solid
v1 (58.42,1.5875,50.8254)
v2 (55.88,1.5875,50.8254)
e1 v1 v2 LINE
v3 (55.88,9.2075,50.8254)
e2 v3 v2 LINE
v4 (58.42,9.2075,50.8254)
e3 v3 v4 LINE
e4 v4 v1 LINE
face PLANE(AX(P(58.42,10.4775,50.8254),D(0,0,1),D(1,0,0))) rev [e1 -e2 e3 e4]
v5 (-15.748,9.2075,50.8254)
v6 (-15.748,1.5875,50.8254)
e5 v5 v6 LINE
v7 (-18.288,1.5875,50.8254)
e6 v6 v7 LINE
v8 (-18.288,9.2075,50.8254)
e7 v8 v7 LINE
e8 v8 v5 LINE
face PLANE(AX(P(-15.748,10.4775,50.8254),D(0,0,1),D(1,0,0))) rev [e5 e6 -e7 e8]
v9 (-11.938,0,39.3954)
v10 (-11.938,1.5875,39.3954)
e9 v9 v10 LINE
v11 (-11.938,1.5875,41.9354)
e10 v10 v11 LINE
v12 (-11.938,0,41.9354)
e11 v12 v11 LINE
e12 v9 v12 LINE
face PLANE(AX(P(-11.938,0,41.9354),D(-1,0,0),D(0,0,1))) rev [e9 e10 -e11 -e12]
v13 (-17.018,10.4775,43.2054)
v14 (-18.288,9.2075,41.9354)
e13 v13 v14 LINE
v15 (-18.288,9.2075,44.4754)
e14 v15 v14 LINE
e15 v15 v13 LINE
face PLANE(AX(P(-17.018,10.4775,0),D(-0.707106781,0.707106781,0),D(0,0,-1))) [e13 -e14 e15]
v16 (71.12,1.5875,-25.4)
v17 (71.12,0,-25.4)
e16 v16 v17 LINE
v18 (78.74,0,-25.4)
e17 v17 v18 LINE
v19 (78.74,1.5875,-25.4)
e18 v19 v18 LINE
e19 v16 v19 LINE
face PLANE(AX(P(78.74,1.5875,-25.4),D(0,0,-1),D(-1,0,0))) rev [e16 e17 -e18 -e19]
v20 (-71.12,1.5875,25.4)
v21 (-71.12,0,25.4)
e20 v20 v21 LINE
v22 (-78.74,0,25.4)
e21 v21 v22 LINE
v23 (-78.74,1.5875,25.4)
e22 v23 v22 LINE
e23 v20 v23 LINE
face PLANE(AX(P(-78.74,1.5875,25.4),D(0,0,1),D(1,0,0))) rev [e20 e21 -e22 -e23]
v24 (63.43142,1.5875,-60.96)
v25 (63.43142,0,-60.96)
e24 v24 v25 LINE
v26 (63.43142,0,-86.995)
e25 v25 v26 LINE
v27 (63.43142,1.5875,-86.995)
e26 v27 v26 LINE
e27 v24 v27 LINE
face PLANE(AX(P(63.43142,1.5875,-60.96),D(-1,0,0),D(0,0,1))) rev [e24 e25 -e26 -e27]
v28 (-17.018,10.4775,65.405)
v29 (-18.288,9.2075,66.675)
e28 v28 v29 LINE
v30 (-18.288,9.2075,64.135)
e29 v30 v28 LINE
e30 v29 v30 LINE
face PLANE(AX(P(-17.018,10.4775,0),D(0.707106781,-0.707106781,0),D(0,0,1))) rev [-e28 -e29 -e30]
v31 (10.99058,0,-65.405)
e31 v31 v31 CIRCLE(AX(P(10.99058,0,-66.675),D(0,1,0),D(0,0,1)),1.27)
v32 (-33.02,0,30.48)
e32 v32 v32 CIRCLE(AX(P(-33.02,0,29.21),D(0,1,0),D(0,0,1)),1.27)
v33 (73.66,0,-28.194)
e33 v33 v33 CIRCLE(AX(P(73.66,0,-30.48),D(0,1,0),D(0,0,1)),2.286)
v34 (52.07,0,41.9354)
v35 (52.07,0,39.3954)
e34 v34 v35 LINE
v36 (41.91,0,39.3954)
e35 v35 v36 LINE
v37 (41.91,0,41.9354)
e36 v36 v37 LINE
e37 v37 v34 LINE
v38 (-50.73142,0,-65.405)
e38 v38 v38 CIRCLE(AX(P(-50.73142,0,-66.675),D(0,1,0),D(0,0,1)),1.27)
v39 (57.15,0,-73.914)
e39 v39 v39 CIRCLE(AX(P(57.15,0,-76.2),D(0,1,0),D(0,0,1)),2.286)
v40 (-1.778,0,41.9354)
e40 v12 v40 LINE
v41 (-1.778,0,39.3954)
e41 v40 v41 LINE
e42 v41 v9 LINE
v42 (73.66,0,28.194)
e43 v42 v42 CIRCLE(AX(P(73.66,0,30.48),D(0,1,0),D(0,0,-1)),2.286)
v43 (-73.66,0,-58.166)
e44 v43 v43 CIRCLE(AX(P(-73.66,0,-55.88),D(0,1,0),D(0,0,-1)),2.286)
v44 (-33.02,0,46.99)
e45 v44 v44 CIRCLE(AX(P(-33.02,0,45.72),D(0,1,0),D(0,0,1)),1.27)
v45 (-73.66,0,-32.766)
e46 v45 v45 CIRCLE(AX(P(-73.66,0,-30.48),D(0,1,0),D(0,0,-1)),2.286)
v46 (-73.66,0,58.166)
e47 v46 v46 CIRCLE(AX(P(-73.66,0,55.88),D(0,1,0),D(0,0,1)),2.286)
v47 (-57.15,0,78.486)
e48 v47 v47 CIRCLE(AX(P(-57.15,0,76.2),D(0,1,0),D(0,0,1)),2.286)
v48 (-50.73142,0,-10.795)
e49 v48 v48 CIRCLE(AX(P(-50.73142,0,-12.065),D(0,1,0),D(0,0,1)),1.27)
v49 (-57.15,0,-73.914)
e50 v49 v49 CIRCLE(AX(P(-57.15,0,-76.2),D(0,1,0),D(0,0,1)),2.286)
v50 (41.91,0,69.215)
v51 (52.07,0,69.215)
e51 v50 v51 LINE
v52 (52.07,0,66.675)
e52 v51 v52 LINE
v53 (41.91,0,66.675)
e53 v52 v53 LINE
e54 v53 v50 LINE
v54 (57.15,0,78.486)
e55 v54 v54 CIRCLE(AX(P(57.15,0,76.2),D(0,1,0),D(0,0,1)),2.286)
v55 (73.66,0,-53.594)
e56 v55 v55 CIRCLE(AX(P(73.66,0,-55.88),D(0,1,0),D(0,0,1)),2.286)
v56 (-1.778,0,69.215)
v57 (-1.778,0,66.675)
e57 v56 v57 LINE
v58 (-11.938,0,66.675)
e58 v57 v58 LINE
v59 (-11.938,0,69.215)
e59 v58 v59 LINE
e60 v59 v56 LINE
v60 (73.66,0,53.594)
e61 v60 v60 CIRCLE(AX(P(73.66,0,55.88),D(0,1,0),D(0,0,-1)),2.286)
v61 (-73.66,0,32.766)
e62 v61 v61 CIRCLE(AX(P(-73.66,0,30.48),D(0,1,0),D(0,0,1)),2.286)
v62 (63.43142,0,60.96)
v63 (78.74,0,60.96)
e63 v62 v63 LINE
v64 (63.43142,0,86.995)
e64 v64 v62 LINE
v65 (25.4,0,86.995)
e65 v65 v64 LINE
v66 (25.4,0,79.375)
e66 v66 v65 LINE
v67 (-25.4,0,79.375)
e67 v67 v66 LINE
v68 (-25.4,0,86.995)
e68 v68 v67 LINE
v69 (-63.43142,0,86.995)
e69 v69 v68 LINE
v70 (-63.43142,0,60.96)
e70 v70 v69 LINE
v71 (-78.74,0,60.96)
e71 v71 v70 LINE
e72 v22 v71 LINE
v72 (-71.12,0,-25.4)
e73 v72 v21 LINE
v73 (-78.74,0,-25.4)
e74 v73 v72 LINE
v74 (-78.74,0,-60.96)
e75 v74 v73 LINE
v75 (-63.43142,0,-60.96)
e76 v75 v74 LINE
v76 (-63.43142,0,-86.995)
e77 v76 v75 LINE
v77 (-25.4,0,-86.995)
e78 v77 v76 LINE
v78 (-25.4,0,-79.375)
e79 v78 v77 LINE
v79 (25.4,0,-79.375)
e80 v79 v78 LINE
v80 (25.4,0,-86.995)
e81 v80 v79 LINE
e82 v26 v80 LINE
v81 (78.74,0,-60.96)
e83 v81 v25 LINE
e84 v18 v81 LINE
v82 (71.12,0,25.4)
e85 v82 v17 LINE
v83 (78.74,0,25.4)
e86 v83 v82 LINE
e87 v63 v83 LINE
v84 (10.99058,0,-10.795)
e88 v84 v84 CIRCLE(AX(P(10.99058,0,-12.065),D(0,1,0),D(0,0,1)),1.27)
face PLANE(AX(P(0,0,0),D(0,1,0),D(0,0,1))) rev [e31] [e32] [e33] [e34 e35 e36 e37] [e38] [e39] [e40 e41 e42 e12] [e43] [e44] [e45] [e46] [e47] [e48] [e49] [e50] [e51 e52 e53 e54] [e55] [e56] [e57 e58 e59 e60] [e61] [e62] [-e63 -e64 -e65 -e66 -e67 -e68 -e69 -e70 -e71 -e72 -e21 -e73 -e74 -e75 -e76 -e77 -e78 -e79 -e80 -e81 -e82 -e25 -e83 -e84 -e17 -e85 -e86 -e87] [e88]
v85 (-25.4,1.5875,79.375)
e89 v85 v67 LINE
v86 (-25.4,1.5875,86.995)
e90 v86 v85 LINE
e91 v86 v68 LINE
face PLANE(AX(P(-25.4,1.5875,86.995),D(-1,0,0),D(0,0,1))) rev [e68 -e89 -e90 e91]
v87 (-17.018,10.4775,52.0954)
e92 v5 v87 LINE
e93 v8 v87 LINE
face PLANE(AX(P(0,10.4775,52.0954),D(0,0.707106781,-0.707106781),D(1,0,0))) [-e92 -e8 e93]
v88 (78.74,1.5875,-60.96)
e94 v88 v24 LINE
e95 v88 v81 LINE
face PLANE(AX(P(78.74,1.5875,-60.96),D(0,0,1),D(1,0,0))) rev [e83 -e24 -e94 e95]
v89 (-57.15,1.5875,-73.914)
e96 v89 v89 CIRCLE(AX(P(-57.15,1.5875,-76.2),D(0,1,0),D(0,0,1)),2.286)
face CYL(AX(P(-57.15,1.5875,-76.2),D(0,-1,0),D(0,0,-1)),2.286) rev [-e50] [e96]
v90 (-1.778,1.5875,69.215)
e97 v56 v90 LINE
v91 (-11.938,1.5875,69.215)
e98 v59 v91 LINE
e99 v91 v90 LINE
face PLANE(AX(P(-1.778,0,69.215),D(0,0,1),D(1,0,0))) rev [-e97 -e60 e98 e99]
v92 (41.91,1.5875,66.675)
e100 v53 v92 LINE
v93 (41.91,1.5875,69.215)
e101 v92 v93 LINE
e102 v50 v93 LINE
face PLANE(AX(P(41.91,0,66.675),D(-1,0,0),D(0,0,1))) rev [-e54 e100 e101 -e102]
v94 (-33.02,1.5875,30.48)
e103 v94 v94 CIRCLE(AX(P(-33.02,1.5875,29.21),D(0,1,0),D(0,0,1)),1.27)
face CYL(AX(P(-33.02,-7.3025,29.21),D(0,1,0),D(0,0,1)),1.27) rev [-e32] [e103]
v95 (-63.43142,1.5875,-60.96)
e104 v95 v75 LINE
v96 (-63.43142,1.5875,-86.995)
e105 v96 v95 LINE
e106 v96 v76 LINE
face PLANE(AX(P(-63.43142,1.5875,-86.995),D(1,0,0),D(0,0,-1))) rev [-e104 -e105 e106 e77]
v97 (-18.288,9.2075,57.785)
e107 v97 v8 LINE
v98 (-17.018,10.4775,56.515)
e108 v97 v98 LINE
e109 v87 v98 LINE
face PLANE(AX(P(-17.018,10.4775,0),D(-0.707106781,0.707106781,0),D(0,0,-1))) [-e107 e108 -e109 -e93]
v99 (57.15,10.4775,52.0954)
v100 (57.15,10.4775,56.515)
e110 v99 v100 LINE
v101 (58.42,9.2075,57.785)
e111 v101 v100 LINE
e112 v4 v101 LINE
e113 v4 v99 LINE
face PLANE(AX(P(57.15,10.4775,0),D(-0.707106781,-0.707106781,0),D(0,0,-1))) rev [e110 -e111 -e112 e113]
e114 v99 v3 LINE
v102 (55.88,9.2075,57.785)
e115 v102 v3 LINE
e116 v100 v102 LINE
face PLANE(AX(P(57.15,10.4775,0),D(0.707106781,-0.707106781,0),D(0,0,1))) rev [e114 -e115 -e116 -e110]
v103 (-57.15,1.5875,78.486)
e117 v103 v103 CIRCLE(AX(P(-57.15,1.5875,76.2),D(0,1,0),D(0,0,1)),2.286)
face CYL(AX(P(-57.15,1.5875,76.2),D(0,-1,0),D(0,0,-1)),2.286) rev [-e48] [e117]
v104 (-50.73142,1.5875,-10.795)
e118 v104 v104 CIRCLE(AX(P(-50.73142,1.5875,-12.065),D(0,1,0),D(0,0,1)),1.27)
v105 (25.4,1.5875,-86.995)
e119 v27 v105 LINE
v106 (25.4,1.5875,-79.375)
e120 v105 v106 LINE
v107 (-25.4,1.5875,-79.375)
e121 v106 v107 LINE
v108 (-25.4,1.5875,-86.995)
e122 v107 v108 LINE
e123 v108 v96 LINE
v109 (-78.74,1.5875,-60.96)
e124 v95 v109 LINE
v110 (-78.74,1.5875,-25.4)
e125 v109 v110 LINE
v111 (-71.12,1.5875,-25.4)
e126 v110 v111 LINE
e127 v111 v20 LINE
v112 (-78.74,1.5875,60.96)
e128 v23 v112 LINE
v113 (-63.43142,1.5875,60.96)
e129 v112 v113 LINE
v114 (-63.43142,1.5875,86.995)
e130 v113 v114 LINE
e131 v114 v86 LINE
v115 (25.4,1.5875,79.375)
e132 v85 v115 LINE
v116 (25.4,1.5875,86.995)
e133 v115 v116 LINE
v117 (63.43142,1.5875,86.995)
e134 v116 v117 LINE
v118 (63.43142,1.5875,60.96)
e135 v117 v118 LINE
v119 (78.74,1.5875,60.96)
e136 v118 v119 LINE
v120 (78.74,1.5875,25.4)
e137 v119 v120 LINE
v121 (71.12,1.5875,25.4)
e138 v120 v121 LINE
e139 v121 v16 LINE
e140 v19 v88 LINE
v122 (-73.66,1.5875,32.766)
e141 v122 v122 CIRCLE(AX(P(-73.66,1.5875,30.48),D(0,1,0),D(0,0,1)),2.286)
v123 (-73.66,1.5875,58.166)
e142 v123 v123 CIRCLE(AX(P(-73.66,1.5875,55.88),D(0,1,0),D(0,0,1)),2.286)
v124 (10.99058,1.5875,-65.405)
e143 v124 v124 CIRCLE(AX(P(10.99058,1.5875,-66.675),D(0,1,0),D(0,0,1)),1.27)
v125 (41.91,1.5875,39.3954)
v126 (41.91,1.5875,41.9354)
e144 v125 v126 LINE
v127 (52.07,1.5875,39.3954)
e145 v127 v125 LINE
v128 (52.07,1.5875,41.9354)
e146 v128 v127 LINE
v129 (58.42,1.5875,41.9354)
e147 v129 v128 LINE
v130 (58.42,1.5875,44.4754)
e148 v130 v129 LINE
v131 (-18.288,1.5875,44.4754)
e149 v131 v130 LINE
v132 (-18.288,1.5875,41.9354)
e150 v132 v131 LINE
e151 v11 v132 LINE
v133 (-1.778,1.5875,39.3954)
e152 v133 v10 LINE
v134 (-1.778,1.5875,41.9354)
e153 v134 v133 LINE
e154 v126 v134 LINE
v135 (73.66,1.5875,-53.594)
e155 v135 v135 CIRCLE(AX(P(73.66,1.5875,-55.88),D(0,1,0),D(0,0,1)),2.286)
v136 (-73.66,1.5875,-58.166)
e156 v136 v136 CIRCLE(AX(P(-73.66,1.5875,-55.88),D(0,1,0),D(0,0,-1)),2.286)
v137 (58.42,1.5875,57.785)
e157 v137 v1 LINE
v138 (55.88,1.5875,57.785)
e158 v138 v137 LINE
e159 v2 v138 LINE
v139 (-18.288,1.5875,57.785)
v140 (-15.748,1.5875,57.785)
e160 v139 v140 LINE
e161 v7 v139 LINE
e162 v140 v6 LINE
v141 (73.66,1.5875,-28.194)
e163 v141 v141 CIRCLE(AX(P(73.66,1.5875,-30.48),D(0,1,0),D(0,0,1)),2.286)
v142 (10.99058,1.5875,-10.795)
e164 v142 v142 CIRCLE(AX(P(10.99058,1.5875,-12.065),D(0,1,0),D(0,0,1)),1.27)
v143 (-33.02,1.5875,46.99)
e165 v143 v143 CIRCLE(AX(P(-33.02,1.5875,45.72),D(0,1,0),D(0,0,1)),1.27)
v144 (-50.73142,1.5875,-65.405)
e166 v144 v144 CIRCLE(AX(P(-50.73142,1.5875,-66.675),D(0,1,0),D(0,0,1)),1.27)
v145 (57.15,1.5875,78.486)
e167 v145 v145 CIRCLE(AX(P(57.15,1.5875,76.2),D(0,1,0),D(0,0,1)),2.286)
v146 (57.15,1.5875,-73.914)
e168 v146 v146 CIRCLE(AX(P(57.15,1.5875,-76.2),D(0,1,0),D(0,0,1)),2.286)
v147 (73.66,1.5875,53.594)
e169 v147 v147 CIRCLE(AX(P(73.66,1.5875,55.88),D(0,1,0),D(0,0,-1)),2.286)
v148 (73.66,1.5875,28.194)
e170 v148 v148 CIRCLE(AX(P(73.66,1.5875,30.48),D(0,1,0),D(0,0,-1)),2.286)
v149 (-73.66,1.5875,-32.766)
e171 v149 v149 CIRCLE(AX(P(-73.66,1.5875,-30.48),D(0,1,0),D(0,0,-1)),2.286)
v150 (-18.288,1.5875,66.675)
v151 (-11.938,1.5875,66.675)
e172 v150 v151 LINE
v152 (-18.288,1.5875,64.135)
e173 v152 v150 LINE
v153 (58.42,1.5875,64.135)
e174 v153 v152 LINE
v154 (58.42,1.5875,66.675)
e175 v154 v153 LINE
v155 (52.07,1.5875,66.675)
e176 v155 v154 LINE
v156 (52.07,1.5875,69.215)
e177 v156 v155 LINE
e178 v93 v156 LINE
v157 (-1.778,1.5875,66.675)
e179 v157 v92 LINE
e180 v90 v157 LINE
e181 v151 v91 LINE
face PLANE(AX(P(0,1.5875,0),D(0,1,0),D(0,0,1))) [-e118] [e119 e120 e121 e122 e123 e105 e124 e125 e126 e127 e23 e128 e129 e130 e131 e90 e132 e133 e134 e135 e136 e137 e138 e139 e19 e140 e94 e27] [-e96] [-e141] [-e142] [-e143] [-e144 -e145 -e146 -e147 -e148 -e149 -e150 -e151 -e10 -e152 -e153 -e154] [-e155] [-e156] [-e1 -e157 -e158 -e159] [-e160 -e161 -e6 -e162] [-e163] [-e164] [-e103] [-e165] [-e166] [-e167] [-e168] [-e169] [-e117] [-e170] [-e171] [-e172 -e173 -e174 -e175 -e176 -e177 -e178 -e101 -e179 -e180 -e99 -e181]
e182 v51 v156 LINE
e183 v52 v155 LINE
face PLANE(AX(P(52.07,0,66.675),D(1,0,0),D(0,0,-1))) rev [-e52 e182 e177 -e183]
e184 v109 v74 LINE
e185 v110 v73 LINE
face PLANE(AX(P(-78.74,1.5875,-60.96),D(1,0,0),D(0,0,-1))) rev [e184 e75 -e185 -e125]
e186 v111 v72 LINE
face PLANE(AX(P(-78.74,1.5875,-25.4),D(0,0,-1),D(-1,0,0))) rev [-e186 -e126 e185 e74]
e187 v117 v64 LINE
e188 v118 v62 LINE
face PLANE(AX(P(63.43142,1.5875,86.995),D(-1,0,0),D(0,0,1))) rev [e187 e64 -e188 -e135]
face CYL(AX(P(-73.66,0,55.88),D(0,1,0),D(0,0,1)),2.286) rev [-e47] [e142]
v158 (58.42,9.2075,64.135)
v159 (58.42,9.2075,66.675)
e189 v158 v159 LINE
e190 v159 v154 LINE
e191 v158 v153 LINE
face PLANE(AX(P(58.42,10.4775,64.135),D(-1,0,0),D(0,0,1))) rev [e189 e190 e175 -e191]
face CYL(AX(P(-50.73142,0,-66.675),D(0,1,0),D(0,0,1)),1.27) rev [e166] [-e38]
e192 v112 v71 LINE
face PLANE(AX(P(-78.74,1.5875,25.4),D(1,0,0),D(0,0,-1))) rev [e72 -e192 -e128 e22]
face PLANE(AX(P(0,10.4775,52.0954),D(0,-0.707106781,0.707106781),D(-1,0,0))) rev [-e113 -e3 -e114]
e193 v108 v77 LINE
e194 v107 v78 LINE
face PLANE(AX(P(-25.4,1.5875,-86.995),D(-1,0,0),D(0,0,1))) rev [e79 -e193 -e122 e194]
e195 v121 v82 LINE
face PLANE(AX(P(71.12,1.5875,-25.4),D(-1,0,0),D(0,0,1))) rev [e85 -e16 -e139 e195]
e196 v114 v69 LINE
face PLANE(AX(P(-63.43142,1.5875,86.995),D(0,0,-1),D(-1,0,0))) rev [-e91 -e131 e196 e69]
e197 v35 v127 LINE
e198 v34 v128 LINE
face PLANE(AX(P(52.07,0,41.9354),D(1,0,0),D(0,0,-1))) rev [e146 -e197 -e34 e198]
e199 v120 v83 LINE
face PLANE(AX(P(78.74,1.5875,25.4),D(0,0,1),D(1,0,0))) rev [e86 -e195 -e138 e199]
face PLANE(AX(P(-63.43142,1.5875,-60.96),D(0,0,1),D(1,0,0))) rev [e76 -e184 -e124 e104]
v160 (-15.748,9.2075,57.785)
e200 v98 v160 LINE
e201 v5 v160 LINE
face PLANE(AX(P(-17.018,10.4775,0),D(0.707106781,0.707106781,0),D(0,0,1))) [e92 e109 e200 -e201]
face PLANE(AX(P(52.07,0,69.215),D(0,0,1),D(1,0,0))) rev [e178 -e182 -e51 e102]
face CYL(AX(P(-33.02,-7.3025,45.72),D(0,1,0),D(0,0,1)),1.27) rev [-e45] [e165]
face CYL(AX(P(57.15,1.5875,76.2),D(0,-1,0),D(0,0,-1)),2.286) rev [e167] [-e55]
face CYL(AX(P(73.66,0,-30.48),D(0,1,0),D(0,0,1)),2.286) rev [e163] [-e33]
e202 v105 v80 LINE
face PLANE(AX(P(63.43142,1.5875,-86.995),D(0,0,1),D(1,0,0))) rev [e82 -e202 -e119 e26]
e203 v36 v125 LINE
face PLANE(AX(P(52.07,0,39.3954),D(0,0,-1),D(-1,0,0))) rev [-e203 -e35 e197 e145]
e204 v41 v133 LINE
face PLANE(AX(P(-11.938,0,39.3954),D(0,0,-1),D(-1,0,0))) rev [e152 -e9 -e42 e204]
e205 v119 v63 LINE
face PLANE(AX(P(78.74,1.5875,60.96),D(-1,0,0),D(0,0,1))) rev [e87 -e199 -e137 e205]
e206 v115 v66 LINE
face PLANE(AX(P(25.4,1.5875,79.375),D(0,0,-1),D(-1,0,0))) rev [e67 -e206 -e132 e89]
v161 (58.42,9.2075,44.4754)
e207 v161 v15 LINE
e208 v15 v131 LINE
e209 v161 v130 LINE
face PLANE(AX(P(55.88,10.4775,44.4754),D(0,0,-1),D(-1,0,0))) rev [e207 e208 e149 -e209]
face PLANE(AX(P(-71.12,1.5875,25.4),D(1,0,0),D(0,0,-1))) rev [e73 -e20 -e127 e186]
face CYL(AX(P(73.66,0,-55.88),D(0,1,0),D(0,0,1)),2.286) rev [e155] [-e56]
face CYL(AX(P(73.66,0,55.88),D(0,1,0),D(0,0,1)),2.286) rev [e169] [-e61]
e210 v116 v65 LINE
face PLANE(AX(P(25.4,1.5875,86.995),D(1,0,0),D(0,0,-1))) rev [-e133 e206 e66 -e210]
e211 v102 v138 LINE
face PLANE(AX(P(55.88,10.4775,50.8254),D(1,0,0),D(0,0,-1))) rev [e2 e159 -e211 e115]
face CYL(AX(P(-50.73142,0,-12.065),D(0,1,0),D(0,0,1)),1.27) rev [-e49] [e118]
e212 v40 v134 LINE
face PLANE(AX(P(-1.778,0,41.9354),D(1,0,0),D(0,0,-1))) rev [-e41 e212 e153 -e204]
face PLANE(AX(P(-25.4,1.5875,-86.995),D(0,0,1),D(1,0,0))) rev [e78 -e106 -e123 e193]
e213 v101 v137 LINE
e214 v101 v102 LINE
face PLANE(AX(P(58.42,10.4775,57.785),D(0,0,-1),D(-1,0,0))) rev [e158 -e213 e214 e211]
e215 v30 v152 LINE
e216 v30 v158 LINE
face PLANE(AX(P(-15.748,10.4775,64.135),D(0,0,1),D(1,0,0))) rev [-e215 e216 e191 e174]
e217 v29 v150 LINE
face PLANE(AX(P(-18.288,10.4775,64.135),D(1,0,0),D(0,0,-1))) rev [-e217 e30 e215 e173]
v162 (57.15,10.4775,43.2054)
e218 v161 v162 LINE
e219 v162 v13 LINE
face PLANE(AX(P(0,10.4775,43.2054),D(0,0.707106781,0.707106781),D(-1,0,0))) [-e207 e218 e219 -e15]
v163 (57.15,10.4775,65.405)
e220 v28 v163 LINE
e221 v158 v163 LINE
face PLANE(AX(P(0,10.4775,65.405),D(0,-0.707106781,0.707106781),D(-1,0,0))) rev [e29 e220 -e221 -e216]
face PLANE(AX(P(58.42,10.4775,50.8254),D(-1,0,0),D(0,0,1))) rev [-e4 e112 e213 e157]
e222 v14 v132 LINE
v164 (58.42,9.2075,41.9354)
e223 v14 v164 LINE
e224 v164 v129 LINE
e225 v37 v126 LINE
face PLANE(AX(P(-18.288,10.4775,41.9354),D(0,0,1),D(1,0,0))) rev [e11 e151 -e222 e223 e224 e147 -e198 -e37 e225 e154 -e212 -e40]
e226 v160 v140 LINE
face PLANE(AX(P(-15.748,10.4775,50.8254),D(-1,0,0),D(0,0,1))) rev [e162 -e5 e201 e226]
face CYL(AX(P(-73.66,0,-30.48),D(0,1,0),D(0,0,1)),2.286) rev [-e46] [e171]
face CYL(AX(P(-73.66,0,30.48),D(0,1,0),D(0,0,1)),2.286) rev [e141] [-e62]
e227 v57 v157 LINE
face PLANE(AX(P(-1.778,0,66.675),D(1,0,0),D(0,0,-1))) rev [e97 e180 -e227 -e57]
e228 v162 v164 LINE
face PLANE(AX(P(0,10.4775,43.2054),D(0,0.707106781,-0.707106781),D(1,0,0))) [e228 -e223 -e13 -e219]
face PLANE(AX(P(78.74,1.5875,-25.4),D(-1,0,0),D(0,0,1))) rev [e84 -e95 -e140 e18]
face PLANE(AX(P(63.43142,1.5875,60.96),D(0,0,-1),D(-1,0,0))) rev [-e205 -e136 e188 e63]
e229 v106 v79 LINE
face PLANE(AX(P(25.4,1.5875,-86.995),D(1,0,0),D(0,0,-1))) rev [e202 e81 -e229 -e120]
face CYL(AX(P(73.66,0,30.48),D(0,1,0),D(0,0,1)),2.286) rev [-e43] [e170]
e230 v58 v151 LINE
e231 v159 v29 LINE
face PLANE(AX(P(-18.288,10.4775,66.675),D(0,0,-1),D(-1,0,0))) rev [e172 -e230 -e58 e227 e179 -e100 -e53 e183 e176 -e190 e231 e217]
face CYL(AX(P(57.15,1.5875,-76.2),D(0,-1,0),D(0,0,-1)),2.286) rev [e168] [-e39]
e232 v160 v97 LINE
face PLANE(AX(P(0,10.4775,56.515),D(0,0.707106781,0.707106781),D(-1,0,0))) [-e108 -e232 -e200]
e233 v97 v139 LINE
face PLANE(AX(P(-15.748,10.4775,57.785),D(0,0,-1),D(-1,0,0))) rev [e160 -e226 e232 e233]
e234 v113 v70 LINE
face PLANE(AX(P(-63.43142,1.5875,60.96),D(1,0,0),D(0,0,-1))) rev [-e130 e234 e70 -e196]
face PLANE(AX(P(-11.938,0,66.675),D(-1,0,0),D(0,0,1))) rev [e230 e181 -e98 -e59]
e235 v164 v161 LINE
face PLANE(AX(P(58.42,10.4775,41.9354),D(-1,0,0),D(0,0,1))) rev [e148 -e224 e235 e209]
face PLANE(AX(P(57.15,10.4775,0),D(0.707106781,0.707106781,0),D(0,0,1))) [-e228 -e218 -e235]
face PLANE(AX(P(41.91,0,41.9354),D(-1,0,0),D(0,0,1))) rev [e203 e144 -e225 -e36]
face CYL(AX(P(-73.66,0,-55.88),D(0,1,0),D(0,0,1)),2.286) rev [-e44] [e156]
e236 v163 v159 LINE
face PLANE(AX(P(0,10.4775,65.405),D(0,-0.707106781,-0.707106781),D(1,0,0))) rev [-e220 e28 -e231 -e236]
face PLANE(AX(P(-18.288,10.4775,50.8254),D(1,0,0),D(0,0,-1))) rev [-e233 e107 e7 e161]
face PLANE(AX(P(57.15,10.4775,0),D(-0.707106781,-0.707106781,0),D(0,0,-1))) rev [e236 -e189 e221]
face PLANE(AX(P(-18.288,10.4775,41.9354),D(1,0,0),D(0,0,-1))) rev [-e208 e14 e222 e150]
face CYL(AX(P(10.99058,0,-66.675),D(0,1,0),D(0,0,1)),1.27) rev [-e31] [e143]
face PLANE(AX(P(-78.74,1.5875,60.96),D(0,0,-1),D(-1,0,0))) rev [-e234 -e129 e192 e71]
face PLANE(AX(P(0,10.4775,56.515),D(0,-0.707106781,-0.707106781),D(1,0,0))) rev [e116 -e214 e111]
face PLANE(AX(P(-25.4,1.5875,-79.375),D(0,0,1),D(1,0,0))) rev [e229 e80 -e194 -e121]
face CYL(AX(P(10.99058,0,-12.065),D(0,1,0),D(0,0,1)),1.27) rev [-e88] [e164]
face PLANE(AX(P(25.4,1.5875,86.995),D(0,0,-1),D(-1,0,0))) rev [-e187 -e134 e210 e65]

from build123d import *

# Parameters (mm, degrees)
SKETCH1_R           = 2.286
BOSS_EXTRUDE1_DEPTH = 1.5875
SKETCH2_R           = 2.286
CUT_EXTRUDE1_DEPTH  = 118.348360795
SKETCH3_R           = 1.27
CUT_EXTRUDE2_DEPTH  = 118.348360795
SKETCH4_W           = 2.54
SKETCH4_H           = 6.9596
BOSS_EXTRUDE2_DEPTH = 8.89
CHAMFER1_SIZE       = 1.27
SKETCH5_W           = 10.16
SKETCH5_H           = 2.54
CUT_EXTRUDE3_DEPTH  = 118.673912678
SKETCH6_R           = 1.27
CUT_EXTRUDE4_DEPTH  = 8.89


with BuildPart() as part:
    # Sketch1 → Boss-Extrude1 (new body)
    with BuildSketch(Plane(origin=(0, 0, 0), x_dir=(1, 0, 0), z_dir=(0, 1, 0))):
        Polygon((-25.4, 86.995), (-63.43142, 86.995), (-63.43142, 60.96), (-78.74, 60.96), (-78.74, 25.4), (-71.12, 25.4), (-71.12, -25.4), (-78.74, -25.4), (-78.74, -60.96), (-63.43142, -60.96), (-63.43142, -86.995), (-25.4, -86.995), (-25.4, -79.375), (25.4, -79.375), (25.4, -86.995), (63.43142, -86.995), (63.43142, -60.96), (78.74, -60.96), (78.74, -25.4), (71.12, -25.4), (71.12, 25.4), (78.74, 25.4), (78.74, 60.96), (63.43142, 60.96), (63.43142, 86.995), (25.4, 86.995), (25.4, 79.375), (-25.4, 79.375), align=None)
        with Locations(Location((-57.15, 76.2, 0), (0, 0, 270))):
            Circle(SKETCH1_R, mode=Mode.SUBTRACT)
        with Locations(Location((57.15, 76.2, 0), (0, 0, 270))):
            Circle(SKETCH1_R, mode=Mode.SUBTRACT)
        with Locations(Location((57.15, -76.2, 0), (0, 0, 270))):
            Circle(SKETCH1_R, mode=Mode.SUBTRACT)
        with Locations(Location((-57.15, -76.2, 0), (0, 0, 270))):
            Circle(SKETCH1_R, mode=Mode.SUBTRACT)
    extrude(amount=BOSS_EXTRUDE1_DEPTH)

    # Sketch2 → Cut-Extrude1 (cut, through all)
    with BuildSketch(Plane(origin=(0, 1.5875, 0), x_dir=(1, 0, 0), z_dir=(0, 1, 0))):
        with Locations(Location((-73.66, -30.48, 0), (0, 0, 270))):
            Circle(SKETCH2_R)
        with Locations(Location((-73.66, -55.88, 0), (0, 0, 270))):
            Circle(SKETCH2_R)
        with Locations(Location((73.66, -55.88, 0), (0, 0, 90))):
            Circle(SKETCH2_R)
        with Locations(Location((73.66, -30.48, 0), (0, 0, 90))):
            Circle(SKETCH2_R)
        with Locations(Location((73.66, 30.48, 0), (0, 0, 270))):
            Circle(SKETCH2_R)
        with Locations(Location((73.66, 55.88, 0), (0, 0, 270))):
            Circle(SKETCH2_R)
        with Locations(Location((-73.66, 55.88, 0), (0, 0, 90))):
            Circle(SKETCH2_R)
        with Locations(Location((-73.66, 30.48, 0), (0, 0, 90))):
            Circle(SKETCH2_R)
    extrude(amount=-CUT_EXTRUDE1_DEPTH, mode=Mode.SUBTRACT)

    # Sketch3 → Cut-Extrude2 (cut, through all)
    with BuildSketch(Plane(origin=(0, 1.5875, 0), x_dir=(1, 0, 0), z_dir=(0, 1, 0))):
        with Locations(Location((-50.73142, 66.675, 0), (0, 0, 270))):
            Circle(SKETCH3_R)
        with Locations(Location((10.99058, 66.675, 0), (0, 0, 270))):
            Circle(SKETCH3_R)
        with Locations(Location((10.99058, 12.065, 0), (0, 0, 270))):
            Circle(SKETCH3_R)
        with Locations(Location((-50.73142, 12.065, 0), (0, 0, 270))):
            Circle(SKETCH3_R)
    extrude(amount=-CUT_EXTRUDE2_DEPTH, mode=Mode.SUBTRACT)

    # Sketch4 → Boss-Extrude2 (add)
    with BuildSketch(Plane(origin=(0, 1.5875, 0), x_dir=(1, 0, 0), z_dir=(0, 1, 0))):
        Polygon((-15.748, -44.4754), (55.88, -44.4754), (58.42, -44.4754), (58.42, -41.9354), (-18.288, -41.9354), (-18.288, -44.4754), align=None)
        with Locations((-17.018, -54.3052)):
            Rectangle(SKETCH4_W, SKETCH4_H)
        Polygon((-15.748, -64.135), (55.88, -64.135), (58.42, -64.135), (58.42, -66.675), (-18.288, -66.675), (-18.288, -64.135), align=None)
        with Locations((57.15, -54.3052)):
            Rectangle(SKETCH4_W, SKETCH4_H)
    extrude(amount=BOSS_EXTRUDE2_DEPTH)

    # Chamfer1
    chamfer1_edges = [part.edges().sort_by_distance(p)[0] for p in [
        (20.066, 10.4775, 44.4754),
        (58.42, 10.4775, 43.2054),
        (20.066, 10.4775, 41.9354),
        (-18.288, 10.4775, 43.2054),
        (20.066, 10.4775, 64.135),
        (-18.288, 10.4775, 65.405),
        (20.066, 10.4775, 66.675),
        (58.42, 10.4775, 65.405),
        (-17.018, 10.4775, 50.8254),
        (-18.288, 10.4775, 54.3052),
        (-17.018, 10.4775, 57.785),
        (-15.748, 10.4775, 54.3052),
        (58.42, 10.4775, 54.3052),
        (57.15, 10.4775, 50.8254),
        (55.88, 10.4775, 54.3052),
        (57.15, 10.4775, 57.785),
    ]]
    chamfer(chamfer1_edges, length=CHAMFER1_SIZE - 0.0001)  # a hair under: the kernel refuses the full size

    # Sketch5 → Cut-Extrude3 (cut, through all)
    with BuildSketch(Plane(origin=(0, 1.5875, 0), x_dir=(1, 0, 0), z_dir=(0, 1, 0))):
        with Locations((-6.858, -40.6654)):
            Rectangle(SKETCH5_W, SKETCH5_H)
        with Locations((46.99, -40.6654)):
            Rectangle(SKETCH5_W, SKETCH5_H)
        with Locations((46.99, -67.945)):
            Rectangle(SKETCH5_W, SKETCH5_H)
        with Locations((-6.858, -67.945)):
            Rectangle(SKETCH5_W, SKETCH5_H)
    extrude(amount=-CUT_EXTRUDE3_DEPTH, mode=Mode.SUBTRACT)

    # Sketch6 → Cut-Extrude4 (cut)
    with BuildSketch(Plane(origin=(0, 1.5875, 0), x_dir=(1, 0, 0), z_dir=(0, 1, 0))):
        with Locations(Location((-33.02, -29.21, 0), (0, 0, 270))):
            Circle(SKETCH6_R)
        with Locations(Location((-33.02, -45.72, 0), (0, 0, 270))):
            Circle(SKETCH6_R)
    extrude(amount=-CUT_EXTRUDE4_DEPTH, mode=Mode.SUBTRACT)


solid = part.part
